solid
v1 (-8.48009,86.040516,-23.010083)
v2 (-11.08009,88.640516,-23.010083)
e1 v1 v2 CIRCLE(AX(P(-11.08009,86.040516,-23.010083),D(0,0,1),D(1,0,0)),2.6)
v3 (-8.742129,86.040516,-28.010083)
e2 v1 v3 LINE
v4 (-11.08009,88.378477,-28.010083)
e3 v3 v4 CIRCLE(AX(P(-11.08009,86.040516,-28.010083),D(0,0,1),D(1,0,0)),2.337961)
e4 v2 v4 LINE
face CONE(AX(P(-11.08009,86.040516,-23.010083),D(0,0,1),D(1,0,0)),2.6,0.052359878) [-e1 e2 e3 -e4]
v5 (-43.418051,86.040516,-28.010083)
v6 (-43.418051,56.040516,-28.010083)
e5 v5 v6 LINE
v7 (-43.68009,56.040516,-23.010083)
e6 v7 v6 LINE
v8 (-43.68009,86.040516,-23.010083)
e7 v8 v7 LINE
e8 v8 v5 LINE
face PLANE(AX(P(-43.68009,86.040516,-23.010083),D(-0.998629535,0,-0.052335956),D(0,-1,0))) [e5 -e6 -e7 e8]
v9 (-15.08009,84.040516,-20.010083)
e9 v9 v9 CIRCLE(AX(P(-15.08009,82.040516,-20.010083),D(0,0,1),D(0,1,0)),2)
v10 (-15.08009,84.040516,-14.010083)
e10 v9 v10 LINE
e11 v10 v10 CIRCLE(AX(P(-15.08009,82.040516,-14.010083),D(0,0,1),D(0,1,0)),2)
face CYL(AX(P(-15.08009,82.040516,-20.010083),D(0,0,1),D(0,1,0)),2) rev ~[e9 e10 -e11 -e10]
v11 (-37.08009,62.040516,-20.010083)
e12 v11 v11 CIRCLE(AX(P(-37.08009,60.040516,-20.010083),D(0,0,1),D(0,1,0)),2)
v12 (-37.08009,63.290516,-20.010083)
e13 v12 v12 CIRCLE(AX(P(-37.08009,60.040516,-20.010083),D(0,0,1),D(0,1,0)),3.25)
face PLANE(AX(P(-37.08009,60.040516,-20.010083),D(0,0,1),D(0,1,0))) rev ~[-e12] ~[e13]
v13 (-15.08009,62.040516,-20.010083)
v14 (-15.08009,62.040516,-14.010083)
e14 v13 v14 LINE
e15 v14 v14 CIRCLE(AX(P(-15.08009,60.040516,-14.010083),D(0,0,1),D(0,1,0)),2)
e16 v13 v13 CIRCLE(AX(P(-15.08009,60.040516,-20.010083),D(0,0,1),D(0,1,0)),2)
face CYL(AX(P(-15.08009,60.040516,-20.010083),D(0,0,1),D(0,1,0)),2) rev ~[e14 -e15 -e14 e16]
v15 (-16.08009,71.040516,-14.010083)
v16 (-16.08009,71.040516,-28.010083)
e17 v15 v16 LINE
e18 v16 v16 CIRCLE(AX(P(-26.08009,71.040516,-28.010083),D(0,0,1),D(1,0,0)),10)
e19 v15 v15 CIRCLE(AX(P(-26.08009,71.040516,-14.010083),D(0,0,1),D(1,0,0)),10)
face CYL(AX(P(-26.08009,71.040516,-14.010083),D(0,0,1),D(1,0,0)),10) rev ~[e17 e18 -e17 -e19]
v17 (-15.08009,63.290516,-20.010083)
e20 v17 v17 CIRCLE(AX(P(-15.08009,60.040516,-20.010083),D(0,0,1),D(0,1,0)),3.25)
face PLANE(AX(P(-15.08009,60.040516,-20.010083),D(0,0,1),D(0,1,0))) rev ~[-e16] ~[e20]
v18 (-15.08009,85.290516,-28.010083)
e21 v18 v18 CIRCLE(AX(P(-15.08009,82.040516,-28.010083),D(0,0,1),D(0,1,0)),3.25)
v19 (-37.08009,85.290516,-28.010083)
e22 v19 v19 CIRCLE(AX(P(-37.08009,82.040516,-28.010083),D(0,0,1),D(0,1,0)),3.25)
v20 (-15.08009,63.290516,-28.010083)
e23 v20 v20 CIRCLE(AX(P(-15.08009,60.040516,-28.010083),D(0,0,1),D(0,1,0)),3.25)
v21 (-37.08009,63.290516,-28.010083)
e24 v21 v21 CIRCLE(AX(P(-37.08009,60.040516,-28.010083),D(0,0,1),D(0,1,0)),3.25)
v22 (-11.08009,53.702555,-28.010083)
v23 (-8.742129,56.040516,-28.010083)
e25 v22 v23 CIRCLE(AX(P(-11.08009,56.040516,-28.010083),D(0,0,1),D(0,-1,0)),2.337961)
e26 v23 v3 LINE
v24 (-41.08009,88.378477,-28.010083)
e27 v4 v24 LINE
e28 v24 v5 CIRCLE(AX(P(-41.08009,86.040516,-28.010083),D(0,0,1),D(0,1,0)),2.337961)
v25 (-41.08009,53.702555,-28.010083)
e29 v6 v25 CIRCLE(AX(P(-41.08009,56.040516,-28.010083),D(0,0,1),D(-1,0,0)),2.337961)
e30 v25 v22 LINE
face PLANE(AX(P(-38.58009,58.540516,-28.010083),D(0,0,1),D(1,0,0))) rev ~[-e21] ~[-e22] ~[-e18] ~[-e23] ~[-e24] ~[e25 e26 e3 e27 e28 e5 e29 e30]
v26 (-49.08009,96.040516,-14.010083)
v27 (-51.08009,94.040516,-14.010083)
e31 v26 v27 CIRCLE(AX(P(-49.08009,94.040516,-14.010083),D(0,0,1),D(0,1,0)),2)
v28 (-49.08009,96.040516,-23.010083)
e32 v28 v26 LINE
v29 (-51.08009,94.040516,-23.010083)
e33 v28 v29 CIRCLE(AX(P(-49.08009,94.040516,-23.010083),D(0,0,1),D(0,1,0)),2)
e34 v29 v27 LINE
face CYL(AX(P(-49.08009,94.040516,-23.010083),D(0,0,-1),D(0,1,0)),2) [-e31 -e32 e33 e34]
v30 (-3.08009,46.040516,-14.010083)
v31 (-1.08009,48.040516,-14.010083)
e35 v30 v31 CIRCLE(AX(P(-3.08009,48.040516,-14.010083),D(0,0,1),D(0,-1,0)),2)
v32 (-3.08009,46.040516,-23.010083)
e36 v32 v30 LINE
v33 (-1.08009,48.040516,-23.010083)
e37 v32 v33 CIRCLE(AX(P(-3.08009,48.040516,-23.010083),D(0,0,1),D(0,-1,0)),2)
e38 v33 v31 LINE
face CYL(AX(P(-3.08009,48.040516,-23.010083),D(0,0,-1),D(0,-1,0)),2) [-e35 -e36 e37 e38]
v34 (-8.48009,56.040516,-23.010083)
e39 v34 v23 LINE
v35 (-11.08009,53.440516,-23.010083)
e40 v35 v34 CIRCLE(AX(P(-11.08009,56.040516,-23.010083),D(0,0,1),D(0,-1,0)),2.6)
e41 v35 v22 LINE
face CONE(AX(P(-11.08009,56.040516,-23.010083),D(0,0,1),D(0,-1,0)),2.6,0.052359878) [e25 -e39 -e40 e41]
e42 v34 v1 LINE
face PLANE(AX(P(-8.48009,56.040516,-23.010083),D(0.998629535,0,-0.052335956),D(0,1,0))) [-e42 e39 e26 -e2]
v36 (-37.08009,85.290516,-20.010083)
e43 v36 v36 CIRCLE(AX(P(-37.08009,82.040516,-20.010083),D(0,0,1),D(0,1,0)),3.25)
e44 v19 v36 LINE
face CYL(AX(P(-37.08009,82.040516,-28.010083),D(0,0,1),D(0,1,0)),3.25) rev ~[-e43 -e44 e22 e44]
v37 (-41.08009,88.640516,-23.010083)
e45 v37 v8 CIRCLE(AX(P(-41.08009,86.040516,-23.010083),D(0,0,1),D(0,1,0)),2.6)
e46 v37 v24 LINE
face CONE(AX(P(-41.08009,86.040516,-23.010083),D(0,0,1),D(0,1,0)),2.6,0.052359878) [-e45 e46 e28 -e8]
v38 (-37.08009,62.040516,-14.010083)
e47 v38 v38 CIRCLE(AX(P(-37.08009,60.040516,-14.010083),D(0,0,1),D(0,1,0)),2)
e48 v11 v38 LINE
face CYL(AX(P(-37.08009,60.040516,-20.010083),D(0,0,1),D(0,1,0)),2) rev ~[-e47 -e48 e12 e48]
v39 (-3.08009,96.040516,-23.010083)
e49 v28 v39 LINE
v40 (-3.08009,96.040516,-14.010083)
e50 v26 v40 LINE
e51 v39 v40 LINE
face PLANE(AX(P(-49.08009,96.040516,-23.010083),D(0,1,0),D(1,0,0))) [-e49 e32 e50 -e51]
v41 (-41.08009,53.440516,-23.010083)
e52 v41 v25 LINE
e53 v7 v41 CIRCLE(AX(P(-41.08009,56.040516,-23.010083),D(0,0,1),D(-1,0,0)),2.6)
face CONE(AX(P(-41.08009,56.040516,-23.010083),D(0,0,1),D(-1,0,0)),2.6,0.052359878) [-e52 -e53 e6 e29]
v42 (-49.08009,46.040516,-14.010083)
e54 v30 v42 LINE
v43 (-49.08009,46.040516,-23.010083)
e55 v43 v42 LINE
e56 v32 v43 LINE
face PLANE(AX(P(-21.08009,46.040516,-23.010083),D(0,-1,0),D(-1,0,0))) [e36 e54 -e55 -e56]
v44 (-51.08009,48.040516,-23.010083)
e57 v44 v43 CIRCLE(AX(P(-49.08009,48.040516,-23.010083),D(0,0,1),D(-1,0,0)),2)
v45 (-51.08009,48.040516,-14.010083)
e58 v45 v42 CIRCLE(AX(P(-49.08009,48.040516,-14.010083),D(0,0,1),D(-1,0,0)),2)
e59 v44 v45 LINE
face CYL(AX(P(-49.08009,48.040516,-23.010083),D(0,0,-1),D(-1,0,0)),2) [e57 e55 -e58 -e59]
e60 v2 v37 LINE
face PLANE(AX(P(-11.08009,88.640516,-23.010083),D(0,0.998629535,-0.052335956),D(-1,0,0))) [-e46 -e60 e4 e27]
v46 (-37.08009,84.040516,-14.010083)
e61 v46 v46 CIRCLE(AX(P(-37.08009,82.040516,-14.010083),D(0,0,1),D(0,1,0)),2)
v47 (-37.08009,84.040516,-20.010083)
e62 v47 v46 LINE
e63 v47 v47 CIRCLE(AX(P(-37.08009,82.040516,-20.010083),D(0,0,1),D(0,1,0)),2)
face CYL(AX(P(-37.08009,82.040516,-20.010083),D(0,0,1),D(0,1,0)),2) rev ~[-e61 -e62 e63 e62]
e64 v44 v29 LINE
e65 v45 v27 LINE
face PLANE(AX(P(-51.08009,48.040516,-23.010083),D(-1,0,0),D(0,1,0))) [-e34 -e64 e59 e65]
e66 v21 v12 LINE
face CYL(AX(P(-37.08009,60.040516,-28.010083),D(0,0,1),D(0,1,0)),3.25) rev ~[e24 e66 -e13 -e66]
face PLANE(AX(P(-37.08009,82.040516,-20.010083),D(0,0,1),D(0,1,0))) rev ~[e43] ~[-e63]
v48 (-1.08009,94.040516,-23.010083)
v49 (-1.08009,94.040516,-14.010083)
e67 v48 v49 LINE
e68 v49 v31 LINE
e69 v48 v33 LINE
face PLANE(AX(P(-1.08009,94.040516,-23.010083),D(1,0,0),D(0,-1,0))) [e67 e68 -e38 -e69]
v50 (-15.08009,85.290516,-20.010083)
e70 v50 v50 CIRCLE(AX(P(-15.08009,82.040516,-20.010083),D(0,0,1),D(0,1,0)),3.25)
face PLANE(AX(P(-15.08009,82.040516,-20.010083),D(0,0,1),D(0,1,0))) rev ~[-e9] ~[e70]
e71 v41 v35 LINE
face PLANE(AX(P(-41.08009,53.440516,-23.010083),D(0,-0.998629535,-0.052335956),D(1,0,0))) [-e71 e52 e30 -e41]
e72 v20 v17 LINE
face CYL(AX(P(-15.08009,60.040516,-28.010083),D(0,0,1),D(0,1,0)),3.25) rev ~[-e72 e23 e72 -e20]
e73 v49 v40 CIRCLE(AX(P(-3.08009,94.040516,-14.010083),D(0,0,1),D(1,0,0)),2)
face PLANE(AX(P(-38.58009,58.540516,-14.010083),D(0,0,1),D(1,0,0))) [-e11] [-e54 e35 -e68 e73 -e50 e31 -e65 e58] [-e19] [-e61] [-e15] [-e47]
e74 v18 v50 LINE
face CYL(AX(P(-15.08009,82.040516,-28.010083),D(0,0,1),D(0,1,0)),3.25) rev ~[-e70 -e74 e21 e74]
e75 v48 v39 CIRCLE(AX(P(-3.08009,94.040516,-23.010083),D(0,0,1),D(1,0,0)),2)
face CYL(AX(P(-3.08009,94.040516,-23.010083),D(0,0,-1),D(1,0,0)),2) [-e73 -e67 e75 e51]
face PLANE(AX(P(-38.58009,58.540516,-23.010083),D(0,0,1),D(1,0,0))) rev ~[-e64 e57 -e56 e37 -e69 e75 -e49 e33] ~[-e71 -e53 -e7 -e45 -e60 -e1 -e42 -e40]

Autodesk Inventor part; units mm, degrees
ref_plane "YZ Plane" through (0, 0, 0) normal (1, 0, 0) x (0, 1, 0)
ref_plane "XZ Plane" through (0, 0, 0) normal (0, 1, 0) x (-1, 0, 0)
ref_plane "XY Plane" through (0, 0, 0) normal (0, 0, 1) x (1, 0, 0)
ref_plane "Arbeitsebene15" through (-38.58009, 58.540516, -23.010083) normal (0, 0, 1) x (1, 0, 0)
sketch "Skizze38" plane through (-38.58009, 58.540516, -23.010083) normal (0, 0, 1) x (1, 0, 0)
  circle A0 centre (27, 33.3) radius 3
  circle A1 centre (-8.3, 27) radius 3
  circle A2 centre (-2, -8.3) radius 3
  circle A3 centre (33.3, -2) radius 3
  circle A4 centre (27, -8.3) radius 3
  circle A5 centre (-8.3, -2) radius 3
  circle A6 centre (-2, 33.3) radius 3
  circle A7 centre (33.3, 27) radius 3
  line L0 (27.5, 29.5) -> (-2.5, 29.5)
  arc A8 (29.5, 27.5) -> (27.5, 29.5) centre (27.5, 27.5) ccw
  line L1 (29.5, 27.5) -> (29.5, -2.5)
  arc A9 (27.5, -4.5) -> (29.5, -2.5) centre (27.5, -2.5) ccw
  line L2 (-2.5, -4.5) -> (27.5, -4.5)
  arc A10 (-4.5, -2.5) -> (-2.5, -4.5) centre (-2.5, -2.5) ccw
  line L3 (-4.5, -2.5) -> (-4.5, 27.5)
  arc A11 (-2.5, 29.5) -> (-4.5, 27.5) centre (-2.5, 27.5) ccw
  circle A12 centre (33.5, 33.5) radius 2.5
  circle A13 centre (-8.5, -8.5) radius 2.5
  circle A14 centre (33.5, -8.5) radius 2.5
  circle A15 centre (-8.5, 33.5) radius 2.5
  line L4 (-11.75, -10.5) -> (-11.75, 8.25)
  arc A16 (-11.75, -10.5) -> (-10.5, -11.75) centre (-10.5, -10.5) ccw
  line L5 (8.25, -11.75) -> (-10.5, -11.75)
  line L6 (8.25, -13.877389) -> (8.25, -11.75)
  arc A17 (7.405556, -14.865216) -> (8.25, -13.877389) centre (7.25, -13.877389) ccw
  arc A18 (7.405556, -14.865216) -> (7.6, -17.35) centre (7.6, -16.1) ccw
  line L7 (17.4, -17.35) -> (7.6, -17.35)
  arc A19 (17.4, -17.35) -> (17.594444, -14.865216) centre (17.4, -16.1) ccw
  arc A20 (16.75, -13.877389) -> (17.594444, -14.865216) centre (17.75, -13.877389) ccw
  line L8 (16.75, -11.75) -> (16.75, -13.877389)
  line L9 (35.5, -11.75) -> (16.75, -11.75)
  arc A21 (35.5, -11.75) -> (36.75, -10.5) centre (35.5, -10.5) ccw
  line L10 (36.75, 6.487451) -> (36.75, -10.5)
  arc A22 (36.75, 6.487451) -> (36.55605, 6.521706) centre (36.65, 6.487451) ccw
  arc A23 (31.3, 7.45) -> (36.55605, 6.521706) centre (34.01, 7.45) ccw
  line L11 (31.3, 17.55) -> (31.3, 7.45)
  arc A24 (36.55605, 18.478294) -> (31.3, 17.55) centre (34.01, 17.55) ccw
  arc A25 (36.55605, 18.478294) -> (36.75, 18.512549) centre (36.65, 18.512549) ccw
  line L12 (36.75, 35.5) -> (36.75, 18.512549)
  arc A26 (36.75, 35.5) -> (35.5, 36.75) centre (35.5, 35.5) ccw
  line L13 (18.512549, 36.75) -> (35.5, 36.75)
  arc A27 (18.512549, 36.75) -> (18.478294, 36.55605) centre (18.512549, 36.65) ccw
  arc A28 (17.55, 31.3) -> (18.478294, 36.55605) centre (17.55, 34.01) ccw
  line L14 (7.45, 31.3) -> (17.55, 31.3)
  arc A29 (6.521706, 36.55605) -> (7.45, 31.3) centre (7.45, 34.01) ccw
  arc A30 (6.521706, 36.55605) -> (6.487451, 36.75) centre (6.487451, 36.65) ccw
  line L15 (-10.5, 36.75) -> (6.487451, 36.75)
  arc A31 (-10.5, 36.75) -> (-11.75, 35.5) centre (-10.5, 35.5) ccw
  line L16 (-11.75, 16.75) -> (-11.75, 35.5)
  line L17 (-13.877389, 16.75) -> (-11.75, 16.75)
  arc A32 (-14.865216, 17.594444) -> (-13.877389, 16.75) centre (-13.877389, 17.75) ccw
  arc A33 (-14.865216, 17.594444) -> (-17.35, 17.4) centre (-16.1, 17.4) ccw
  line L18 (-17.35, 7.6) -> (-17.35, 17.4)
  arc A34 (-17.35, 7.6) -> (-14.865216, 7.405556) centre (-16.1, 7.6) ccw
  arc A35 (-13.877389, 8.25) -> (-14.865216, 7.405556) centre (-13.877389, 7.25) ccw
  line L19 (-11.75, 8.25) -> (-13.877389, 8.25)
  line L20 (-2.5, 30.1) -> (27.5, 30.1)
  arc A36 (30.1, 27.5) -> (27.5, 30.1) centre (27.5, 27.5) ccw
  line L21 (30.1, 27.5) -> (30.1, -2.5)
  arc A37 (27.5, -5.1) -> (30.1, -2.5) centre (27.5, -2.5) ccw
  line L22 (27.5, -5.1) -> (-2.5, -5.1)
  arc A38 (-5.1, -2.5) -> (-2.5, -5.1) centre (-2.5, -2.5) ccw
  line L23 (-5.1, -2.5) -> (-5.1, 27.5)
  arc A39 (-2.5, 30.1) -> (-5.1, 27.5) centre (-2.5, 27.5) ccw
  point P0 (38.58009, -58.540516)
  dimension "d425" = 0.6
sketch "Skizze38 outline for Extrusion20" plane through (-38.58009, 58.540516, -23.010083) normal (0, 0, 1) x (1, 0, 0)
  arc A0 (-5.1, -2.5) -> (-2.5, -5.1) centre (-2.5, -2.5) ccw
  line L0 (-5.1, 27.5) -> (-5.1, -2.5)
  arc A1 (-2.5, 30.1) -> (-5.1, 27.5) centre (-2.5, 27.5) ccw
  line L1 (27.5, 30.1) -> (-2.5, 30.1)
  arc A2 (30.1, 27.5) -> (27.5, 30.1) centre (27.5, 27.5) ccw
  line L2 (30.1, -2.5) -> (30.1, 27.5)
  arc A3 (27.5, -5.1) -> (30.1, -2.5) centre (27.5, -2.5) ccw
  line L3 (-2.5, -5.1) -> (27.5, -5.1)
extrude "Extrusion20" add sketch "Skizze38 outline for Extrusion20" against normal blind 5 draft -3
sketch "Skizze39" plane through (-38.58009, 58.540516, -23.010083) normal (0, 0, 1) x (1, 0, 0)
  line L0 (-2.5, -5.1) -> (27.5, -5.1) projected
  arc A0 (27.5, -5.1) -> (30.1, -2.5) centre (27.5, -2.5) ccw projected
  line L1 (30.1, -2.5) -> (30.1, 27.5) projected
  arc A1 (30.1, 27.5) -> (27.5, 30.1) centre (27.5, 27.5) ccw projected
  line L2 (27.5, 30.1) -> (-2.5, 30.1) projected
  arc A2 (-2.5, 30.1) -> (-5.1, 27.5) centre (-2.5, 27.5) ccw projected
  line L3 (-5.1, 27.5) -> (-5.1, -2.5) projected
  arc A3 (-5.1, -2.5) -> (-2.5, -5.1) centre (-2.5, -2.5) ccw projected
  line L4 (17.5, -12.5) -> (35.5, -12.5) projected
  line L5 (-10.5, 37.5) -> (35.5, 37.5)
  line L6 (37.5, 35.5) -> (37.5, -10.5)
  line L7 (35.5, -12.5) -> (-10.5, -12.5)
  line L8 (-12.5, -10.5) -> (-12.5, 35.5)
  line L9 (-12.5, 37.5) -> (37.5, -12.5) construction
  line L10 (37.5, 37.5) -> (-12.5, -12.5) construction
  arc A4 (37.5, 35.5) -> (35.5, 37.5) centre (35.5, 35.5) ccw projected
  arc A5 (37.5, 35.5) -> (35.5, 37.5) centre (35.5, 35.5) ccw
  arc A6 (-10.5, 37.5) -> (-12.5, 35.5) centre (-10.5, 35.5) ccw
  arc A7 (-12.5, -10.5) -> (-10.5, -12.5) centre (-10.5, -10.5) ccw
  arc A8 (35.5, -12.5) -> (37.5, -10.5) centre (35.5, -10.5) ccw
  point P0 (38.58009, -58.540516)
  point P1 (12.5, 12.5)
  point P2 (35.5, -12.5)
  dimension "d428" = 50
  dimension "d429" = 50
  dimension "d430" = 2
extrude "Extrusion21" add sketch "Skizze39" along normal blind 9 contours A3 L3 A2 L2 A1 L1 A0 L0 | L7 A7 L8 A6 L5 A4 L6 A8 L4
sketch "Skizze40" plane through (-38.58009, 58.540516, -14.010083) normal (0, 0, 1) x (1, 0, 0)
  arc A0 (-10.5, 37.5) -> (-12.5, 35.5) centre (-10.5, 35.5) ccw projected
  line L0 (-12.5, 35.5) -> (-12.5, -10.5) projected
  arc A1 (-12.5, -10.5) -> (-10.5, -12.5) centre (-10.5, -10.5) ccw projected
  line L1 (-10.5, -12.5) -> (35.5, -12.5) projected
  arc A2 (35.5, -12.5) -> (37.5, -10.5) centre (35.5, -10.5) ccw projected
  line L2 (37.5, -10.5) -> (37.5, 35.5) projected
  arc A3 (37.5, 35.5) -> (35.5, 37.5) centre (35.5, 35.5) ccw projected
  line L3 (35.5, 37.5) -> (-10.5, 37.5) projected
  circle A4 centre (12.5, 12.5) radius 10
  line L4 (1.5, 23.5) -> (23.5, 23.5)
  line L5 (23.5, 23.5) -> (23.5, 1.5)
  line L6 (23.5, 1.5) -> (1.5, 1.5)
  line L7 (1.5, 1.5) -> (1.5, 23.5)
  line L8 (1.5, 23.5) -> (23.5, 1.5) construction
  line L9 (23.5, 23.5) -> (1.5, 1.5) construction
  circle A5 centre (1.5, 1.5) radius 1.6
  circle A6 centre (1.5, 23.5) radius 1.6
  circle A7 centre (23.5, 23.5) radius 1.6
  circle A8 centre (23.5, 1.5) radius 1.6
  dimension "d466" = 20
  dimension "d467" = 22
  dimension "d468" = 22
  dimension "d469" = 3.2
  dimension "d470" = 3.2
  dimension "d471" = 3.2
  dimension "d472" = 3.2
extrude "Extrusion22" cut sketch "Skizze40" against normal through all contours A4 | L7 A6 L4 | L4 A6 L7 | A7 L5 L4 | L4 L5 A7 | A5 L6 L7 | L7 L6 A5 | A8 L6 L5 | L5 L6 A8
sketch "Skizze43" plane through (-38.58009, 58.540516, -28.010083) normal (0, 0, -1) x (-1, 0, 0)
  circle A0 centre (-1.5, 23.5) radius 1.6
  circle A1 centre (-1.5, 1.5) radius 1.6
  circle A2 centre (-23.5, 23.5) radius 1.6
  circle A3 centre (-12.5, 12.5) radius 10
  circle A4 centre (-23.5, 1.5) radius 1.6
  line L0 (2.5, -4.837961) -> (-27.5, -4.837961)
  arc A5 (2.5, -4.837961) -> (4.837961, -2.5) centre (2.5, -2.5) ccw
  line L1 (4.837961, 27.5) -> (4.837961, -2.5)
  arc A6 (4.837961, 27.5) -> (2.5, 29.837961) centre (2.5, 27.5) ccw
  line L2 (-27.5, 29.837961) -> (2.5, 29.837961)
  arc A7 (-27.5, 29.837961) -> (-29.837961, 27.5) centre (-27.5, 27.5) ccw
  line L3 (-29.837961, -2.5) -> (-29.837961, 27.5)
  arc A8 (-29.837961, -2.5) -> (-27.5, -4.837961) centre (-27.5, -2.5) ccw
  circle A9 centre (-23.5, 1.5) radius 1.6
  circle A10 centre (-1.5, 23.5) radius 1.6
  circle A11 centre (-1.5, 1.5) radius 1.6
  point P0 (-38.58009, -58.540516)
  point P1 (-23.5, 1.5)
  point P2 (-23.5, 23.5)
  point P3 (-1.5, 23.5)
  point P4 (-1.5, 1.5)
hole "Bohrung11" at (-15.08009, 60.040516, -28.010083) at (-15.08009, 82.040516, -28.010083) at (-37.08009, 82.040516, -28.010083) at (-37.08009, 60.040516, -28.010083) direction (0, 0, 1) diameter 4 end through all counterbore diameter 6.5 counterbore depth 8
equation "\"d_i\" = 40"
equation "\"d_o\" = 40"
equation "\"d_part\" = 50"
equation "\"d6\" = 0"
equation "\"d7\" = 0"
equation "\"d8\" = 0"
equation "\"d9\" = 0"
equation "\"d13\" = 0"
equation "\"d14\" = 0"
equation "\"d20\" = 0"
equation "\"d21\" = 0"
equation "\"d22\" = 0"
equation "\"d23\" = 0"
equation "\"d24\" = 0"
equation "\"d25\" = 3"
equation "\"d26\" = 0"
equation "\"d27\" = 0"
equation "\"d28\" = 0"
equation "\"d29\" = 0"
equation "\"d30\" = 0"
equation "\"d31\" = 0"
equation "\"d32\" = 0"
equation "\"d33\" = 0"
equation "\"d34\" = 0"
equation "\"d46\" = 0"
equation "\"d47\" = 0"
equation "\"d48\" = 0"
equation "\"d50\" = 0"
equation "\"d51\" = 0"
equation "\"d52\" = 0"
equation "\"d53\" = 0"
equation "\"d54\" = 0"
equation "\"d55\" = 0"
equation "\"d56\" = 0"
equation "\"d57\" = 0"
equation "\"d58\" = 0"
equation "\"d59\" = 0"
equation "\"magnet_offset\" = 0"
equation "\"screw_offset\" = 0"
equation "\"mal_puzzle_offset\" = 0"
equation "\"fem_puzzle_offset\" = 0"
properties part number "20_Cube_Adapter_Zstage_motorized"
